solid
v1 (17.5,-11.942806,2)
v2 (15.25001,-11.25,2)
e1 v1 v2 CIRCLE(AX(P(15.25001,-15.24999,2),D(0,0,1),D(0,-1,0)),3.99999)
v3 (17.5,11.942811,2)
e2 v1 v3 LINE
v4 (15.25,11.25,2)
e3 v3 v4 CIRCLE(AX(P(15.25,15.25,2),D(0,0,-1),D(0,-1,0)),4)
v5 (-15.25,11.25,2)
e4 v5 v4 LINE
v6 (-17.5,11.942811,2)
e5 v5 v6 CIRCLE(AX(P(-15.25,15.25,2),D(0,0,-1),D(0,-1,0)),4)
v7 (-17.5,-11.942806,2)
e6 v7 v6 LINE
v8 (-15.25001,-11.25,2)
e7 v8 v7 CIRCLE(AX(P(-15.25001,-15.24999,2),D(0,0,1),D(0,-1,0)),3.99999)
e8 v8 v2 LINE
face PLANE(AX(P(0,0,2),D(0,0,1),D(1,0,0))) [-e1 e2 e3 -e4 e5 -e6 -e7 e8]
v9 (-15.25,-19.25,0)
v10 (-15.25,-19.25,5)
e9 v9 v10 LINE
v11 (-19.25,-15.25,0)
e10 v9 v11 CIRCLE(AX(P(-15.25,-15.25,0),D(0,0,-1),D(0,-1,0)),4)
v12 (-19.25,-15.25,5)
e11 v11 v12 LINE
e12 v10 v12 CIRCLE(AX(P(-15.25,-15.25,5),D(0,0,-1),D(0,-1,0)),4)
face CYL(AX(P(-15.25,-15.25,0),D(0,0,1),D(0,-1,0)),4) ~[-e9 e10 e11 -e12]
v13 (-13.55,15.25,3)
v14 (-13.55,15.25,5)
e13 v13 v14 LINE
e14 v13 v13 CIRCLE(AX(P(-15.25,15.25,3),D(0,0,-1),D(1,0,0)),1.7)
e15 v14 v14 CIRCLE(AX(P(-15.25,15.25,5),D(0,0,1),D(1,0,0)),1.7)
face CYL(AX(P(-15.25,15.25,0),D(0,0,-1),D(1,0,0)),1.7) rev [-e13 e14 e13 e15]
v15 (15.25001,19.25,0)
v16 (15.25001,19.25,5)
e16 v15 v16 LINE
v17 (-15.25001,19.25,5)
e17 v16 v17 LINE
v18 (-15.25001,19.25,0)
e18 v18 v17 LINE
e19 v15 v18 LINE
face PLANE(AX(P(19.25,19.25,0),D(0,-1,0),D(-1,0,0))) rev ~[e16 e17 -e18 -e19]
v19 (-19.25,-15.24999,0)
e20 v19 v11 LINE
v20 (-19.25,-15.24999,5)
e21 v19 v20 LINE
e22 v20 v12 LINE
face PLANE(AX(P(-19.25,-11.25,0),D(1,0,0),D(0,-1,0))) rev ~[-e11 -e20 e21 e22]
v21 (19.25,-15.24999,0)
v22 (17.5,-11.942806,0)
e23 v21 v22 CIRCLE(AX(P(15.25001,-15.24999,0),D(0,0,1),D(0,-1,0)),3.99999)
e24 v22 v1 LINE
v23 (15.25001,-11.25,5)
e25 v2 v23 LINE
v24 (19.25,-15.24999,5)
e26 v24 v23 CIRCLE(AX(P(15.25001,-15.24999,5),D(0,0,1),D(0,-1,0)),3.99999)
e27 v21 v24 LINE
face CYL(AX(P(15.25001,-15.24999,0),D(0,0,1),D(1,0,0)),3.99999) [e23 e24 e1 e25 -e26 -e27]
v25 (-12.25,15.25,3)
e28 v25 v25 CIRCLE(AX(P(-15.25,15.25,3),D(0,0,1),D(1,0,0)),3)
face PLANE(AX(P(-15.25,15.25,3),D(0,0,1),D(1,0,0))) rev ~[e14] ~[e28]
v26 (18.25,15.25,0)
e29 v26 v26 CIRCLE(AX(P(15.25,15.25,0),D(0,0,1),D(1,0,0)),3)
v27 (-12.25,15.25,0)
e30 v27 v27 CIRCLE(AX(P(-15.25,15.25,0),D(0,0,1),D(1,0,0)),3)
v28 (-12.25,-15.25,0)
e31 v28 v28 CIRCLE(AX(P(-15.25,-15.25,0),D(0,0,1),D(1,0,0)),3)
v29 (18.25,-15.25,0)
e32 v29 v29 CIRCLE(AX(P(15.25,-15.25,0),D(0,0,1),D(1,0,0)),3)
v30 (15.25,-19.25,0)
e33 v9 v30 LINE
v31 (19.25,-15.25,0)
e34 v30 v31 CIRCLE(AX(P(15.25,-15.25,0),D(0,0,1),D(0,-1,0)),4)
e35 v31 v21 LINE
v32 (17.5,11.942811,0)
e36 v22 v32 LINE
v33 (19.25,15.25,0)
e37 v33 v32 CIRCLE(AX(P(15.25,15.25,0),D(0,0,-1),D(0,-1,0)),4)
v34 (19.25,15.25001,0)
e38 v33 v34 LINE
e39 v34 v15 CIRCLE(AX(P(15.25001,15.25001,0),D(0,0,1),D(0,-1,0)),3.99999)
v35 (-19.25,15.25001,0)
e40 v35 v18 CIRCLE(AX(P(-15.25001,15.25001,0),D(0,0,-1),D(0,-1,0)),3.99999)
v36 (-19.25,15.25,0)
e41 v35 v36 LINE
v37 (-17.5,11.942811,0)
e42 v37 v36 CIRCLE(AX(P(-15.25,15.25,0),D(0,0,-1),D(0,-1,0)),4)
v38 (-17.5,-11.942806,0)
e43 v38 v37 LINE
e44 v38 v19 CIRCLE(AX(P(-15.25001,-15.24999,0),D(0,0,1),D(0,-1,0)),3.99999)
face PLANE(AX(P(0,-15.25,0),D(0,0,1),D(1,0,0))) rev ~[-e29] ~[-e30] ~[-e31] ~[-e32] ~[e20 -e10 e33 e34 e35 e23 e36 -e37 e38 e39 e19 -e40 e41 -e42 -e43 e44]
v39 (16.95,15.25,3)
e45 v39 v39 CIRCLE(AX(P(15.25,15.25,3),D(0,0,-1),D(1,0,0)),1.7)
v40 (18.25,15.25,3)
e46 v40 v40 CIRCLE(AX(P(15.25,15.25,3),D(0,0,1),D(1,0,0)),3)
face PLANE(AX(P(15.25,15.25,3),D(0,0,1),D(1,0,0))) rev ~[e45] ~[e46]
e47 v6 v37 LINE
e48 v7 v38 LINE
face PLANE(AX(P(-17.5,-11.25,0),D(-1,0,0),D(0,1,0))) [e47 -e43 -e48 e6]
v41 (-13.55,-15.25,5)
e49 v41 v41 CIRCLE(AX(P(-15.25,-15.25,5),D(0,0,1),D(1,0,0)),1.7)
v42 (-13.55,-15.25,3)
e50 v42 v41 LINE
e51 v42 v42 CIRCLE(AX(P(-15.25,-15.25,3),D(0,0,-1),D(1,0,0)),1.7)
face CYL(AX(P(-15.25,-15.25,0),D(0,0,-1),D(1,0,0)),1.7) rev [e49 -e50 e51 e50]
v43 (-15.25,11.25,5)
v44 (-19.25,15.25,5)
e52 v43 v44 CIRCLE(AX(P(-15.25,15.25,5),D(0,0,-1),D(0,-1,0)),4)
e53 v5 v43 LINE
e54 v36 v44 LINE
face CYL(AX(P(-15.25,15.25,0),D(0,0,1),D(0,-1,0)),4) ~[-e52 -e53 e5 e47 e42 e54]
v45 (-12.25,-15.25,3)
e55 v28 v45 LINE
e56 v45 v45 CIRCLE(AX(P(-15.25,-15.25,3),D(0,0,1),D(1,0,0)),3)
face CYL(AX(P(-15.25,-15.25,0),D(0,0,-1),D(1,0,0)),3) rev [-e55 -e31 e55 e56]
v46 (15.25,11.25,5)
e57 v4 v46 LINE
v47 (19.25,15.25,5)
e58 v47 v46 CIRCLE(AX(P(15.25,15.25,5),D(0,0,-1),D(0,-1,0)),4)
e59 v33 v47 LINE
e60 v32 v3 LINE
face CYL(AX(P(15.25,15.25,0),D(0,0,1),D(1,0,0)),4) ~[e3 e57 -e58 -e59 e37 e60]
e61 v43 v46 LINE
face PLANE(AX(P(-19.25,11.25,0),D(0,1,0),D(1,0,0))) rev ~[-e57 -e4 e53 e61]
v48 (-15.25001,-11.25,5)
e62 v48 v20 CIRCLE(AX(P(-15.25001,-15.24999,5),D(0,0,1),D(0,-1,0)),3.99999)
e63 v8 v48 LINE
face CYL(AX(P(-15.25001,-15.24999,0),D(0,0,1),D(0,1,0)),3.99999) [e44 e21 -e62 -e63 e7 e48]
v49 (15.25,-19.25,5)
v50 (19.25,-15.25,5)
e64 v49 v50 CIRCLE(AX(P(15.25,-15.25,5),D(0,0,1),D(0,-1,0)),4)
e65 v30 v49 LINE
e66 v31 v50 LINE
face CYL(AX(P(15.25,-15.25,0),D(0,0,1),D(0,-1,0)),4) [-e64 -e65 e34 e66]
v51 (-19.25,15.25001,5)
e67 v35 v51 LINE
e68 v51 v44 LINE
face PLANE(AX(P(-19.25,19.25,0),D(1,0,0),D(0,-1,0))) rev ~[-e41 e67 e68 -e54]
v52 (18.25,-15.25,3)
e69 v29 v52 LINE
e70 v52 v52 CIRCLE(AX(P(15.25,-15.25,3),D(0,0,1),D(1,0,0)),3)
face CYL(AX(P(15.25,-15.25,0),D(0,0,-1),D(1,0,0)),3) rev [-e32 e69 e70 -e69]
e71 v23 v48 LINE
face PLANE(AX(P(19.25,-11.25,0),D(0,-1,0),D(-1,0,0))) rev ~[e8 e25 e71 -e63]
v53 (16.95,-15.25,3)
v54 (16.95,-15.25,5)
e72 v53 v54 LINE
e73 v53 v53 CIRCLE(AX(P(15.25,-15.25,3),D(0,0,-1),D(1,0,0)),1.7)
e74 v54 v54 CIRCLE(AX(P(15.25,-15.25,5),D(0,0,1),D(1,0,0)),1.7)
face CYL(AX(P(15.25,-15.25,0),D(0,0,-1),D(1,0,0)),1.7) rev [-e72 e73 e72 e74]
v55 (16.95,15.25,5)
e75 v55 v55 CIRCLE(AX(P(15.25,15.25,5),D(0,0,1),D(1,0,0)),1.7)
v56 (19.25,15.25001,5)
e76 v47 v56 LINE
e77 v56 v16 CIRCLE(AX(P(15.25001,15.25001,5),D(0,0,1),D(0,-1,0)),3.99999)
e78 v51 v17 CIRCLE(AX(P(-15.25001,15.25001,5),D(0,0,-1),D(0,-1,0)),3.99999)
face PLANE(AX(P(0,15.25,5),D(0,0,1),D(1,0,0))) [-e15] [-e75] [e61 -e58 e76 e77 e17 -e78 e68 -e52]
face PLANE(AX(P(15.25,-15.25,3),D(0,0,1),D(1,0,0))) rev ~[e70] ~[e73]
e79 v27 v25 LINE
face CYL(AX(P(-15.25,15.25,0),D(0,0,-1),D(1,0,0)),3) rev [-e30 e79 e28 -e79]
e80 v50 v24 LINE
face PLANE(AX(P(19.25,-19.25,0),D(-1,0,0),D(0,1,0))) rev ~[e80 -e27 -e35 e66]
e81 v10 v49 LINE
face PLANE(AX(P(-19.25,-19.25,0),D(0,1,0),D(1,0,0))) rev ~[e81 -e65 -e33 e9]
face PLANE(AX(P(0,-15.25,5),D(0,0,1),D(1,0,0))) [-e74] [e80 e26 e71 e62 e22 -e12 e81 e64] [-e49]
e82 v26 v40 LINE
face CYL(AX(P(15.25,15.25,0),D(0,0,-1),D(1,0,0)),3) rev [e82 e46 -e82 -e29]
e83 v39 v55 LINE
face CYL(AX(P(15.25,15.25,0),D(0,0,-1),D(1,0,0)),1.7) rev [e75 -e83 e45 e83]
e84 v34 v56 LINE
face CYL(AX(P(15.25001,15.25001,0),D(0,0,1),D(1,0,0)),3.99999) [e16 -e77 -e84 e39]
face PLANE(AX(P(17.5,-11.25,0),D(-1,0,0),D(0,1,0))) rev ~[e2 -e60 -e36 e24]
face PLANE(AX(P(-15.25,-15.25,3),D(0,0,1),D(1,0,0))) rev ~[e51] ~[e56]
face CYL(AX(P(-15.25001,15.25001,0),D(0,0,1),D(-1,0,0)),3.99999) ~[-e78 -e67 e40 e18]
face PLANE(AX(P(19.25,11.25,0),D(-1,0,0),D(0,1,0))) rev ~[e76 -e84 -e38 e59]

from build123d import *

# Parameters (mm, degrees)
F0_W     = 35
F0_H     = 22.5
F1_DEPTH = 2
F0_R     = 1.7
F2_DEPTH = 5
F3_R     = 4
F3_R_2   = 3.99999
F4_R     = 3
F5_DEPTH = 3


# Not quite as in the source:
# - a fillet or chamfer is up to 0.001 mm smaller than in the source, because OpenCascade refuses the exact size


with BuildPart() as f1:
    # F0 (on Top) → F1 (new body)
    with BuildSketch(Plane.XY):
        Rectangle(F0_W, F0_H)
    extrude(amount=F1_DEPTH)

    # F0 (on Top) → F2 (join)
    with BuildSketch(Plane.XY):
        Polygon((-19.25, -11.25), (-19.25, -19.25), (19.25, -19.25), (19.25, -11.25), (17.5, -11.25), (-17.5, -11.25), align=None)
        with Locations((-15.25, -15.25)):
            Circle(F0_R, mode=Mode.SUBTRACT)
        with Locations((15.25, -15.25)):
            Circle(F0_R, mode=Mode.SUBTRACT)
        Polygon((-19.25, 19.25), (-19.25, 11.25), (-17.5, 11.25), (17.5, 11.25), (19.25, 11.25), (19.25, 19.25), align=None)
        with Locations((-15.25, 15.25)):
            Circle(F0_R, mode=Mode.SUBTRACT)
        with Locations((15.25, 15.25)):
            Circle(F0_R, mode=Mode.SUBTRACT)
    extrude(amount=F2_DEPTH)

    # F3 (call 1 of 8: OpenCascade refuses the feature's edges together)
    f3_edges = [f1.edges().sort_by_distance(p)[0] for p in [
        (19.25, -19.25, 2.5),
    ]]
    fillet(f3_edges, radius=F3_R)

    # F3#2 (call 2 of 8) (radius 4 in the source; OpenCascade refuses exactly that, so slightly less here)
    f3_2_edges = [f1.edges().sort_by_distance(p)[0] for p in [
        (19.25, -11.25, 2.5),
    ]]
    fillet(f3_2_edges, radius=F3_R_2)

    # F3#3 (call 3 of 8)
    f3_3_edges = [f1.edges().sort_by_distance(p)[0] for p in [
        (-19.25, -19.25, 2.5),
    ]]
    fillet(f3_3_edges, radius=F3_R)

    # F3#4 (call 4 of 8)
    f3_4_edges = [f1.edges().sort_by_distance(p)[0] for p in [
        (-19.25, 11.25, 2.5),
    ]]
    fillet(f3_4_edges, radius=F3_R)

    # F3#5 (call 5 of 8)
    f3_5_edges = [f1.edges().sort_by_distance(p)[0] for p in [
        (19.25, 11.25, 2.5),
    ]]
    fillet(f3_5_edges, radius=F3_R)

    # F3#6 (call 6 of 8) (radius 4 in the source; OpenCascade refuses exactly that, so slightly less here)
    f3_6_edges = [f1.edges().sort_by_distance(p)[0] for p in [
        (19.25, 19.25, 2.5),
    ]]
    fillet(f3_6_edges, radius=F3_R_2)

    # F3#7 (call 7 of 8) (radius 4 in the source; OpenCascade refuses exactly that, so slightly less here)
    f3_7_edges = [f1.edges().sort_by_distance(p)[0] for p in [
        (-19.25, -11.25, 2.5),
    ]]
    fillet(f3_7_edges, radius=F3_R_2)

    # F3#8 (call 8 of 8) (radius 4 in the source; OpenCascade refuses exactly that, so slightly less here)
    f3_8_edges = [f1.edges().sort_by_distance(p)[0] for p in [
        (-19.25, 19.25, 2.5),
    ]]
    fillet(f3_8_edges, radius=F3_R_2)

    # F4 (on face) → F5 (cut)
    with BuildSketch(Plane.XY):
        with Locations((-15.25, -15.25)):
            Circle(F4_R)
        with Locations((15.25, -15.25)):
            Circle(F4_R)
        with Locations((15.25, 15.25)):
            Circle(F4_R)
        with Locations((-15.25, 15.25)):
            Circle(F4_R)
    extrude(amount=F5_DEPTH, mode=Mode.SUBTRACT)


solid = f1.part
